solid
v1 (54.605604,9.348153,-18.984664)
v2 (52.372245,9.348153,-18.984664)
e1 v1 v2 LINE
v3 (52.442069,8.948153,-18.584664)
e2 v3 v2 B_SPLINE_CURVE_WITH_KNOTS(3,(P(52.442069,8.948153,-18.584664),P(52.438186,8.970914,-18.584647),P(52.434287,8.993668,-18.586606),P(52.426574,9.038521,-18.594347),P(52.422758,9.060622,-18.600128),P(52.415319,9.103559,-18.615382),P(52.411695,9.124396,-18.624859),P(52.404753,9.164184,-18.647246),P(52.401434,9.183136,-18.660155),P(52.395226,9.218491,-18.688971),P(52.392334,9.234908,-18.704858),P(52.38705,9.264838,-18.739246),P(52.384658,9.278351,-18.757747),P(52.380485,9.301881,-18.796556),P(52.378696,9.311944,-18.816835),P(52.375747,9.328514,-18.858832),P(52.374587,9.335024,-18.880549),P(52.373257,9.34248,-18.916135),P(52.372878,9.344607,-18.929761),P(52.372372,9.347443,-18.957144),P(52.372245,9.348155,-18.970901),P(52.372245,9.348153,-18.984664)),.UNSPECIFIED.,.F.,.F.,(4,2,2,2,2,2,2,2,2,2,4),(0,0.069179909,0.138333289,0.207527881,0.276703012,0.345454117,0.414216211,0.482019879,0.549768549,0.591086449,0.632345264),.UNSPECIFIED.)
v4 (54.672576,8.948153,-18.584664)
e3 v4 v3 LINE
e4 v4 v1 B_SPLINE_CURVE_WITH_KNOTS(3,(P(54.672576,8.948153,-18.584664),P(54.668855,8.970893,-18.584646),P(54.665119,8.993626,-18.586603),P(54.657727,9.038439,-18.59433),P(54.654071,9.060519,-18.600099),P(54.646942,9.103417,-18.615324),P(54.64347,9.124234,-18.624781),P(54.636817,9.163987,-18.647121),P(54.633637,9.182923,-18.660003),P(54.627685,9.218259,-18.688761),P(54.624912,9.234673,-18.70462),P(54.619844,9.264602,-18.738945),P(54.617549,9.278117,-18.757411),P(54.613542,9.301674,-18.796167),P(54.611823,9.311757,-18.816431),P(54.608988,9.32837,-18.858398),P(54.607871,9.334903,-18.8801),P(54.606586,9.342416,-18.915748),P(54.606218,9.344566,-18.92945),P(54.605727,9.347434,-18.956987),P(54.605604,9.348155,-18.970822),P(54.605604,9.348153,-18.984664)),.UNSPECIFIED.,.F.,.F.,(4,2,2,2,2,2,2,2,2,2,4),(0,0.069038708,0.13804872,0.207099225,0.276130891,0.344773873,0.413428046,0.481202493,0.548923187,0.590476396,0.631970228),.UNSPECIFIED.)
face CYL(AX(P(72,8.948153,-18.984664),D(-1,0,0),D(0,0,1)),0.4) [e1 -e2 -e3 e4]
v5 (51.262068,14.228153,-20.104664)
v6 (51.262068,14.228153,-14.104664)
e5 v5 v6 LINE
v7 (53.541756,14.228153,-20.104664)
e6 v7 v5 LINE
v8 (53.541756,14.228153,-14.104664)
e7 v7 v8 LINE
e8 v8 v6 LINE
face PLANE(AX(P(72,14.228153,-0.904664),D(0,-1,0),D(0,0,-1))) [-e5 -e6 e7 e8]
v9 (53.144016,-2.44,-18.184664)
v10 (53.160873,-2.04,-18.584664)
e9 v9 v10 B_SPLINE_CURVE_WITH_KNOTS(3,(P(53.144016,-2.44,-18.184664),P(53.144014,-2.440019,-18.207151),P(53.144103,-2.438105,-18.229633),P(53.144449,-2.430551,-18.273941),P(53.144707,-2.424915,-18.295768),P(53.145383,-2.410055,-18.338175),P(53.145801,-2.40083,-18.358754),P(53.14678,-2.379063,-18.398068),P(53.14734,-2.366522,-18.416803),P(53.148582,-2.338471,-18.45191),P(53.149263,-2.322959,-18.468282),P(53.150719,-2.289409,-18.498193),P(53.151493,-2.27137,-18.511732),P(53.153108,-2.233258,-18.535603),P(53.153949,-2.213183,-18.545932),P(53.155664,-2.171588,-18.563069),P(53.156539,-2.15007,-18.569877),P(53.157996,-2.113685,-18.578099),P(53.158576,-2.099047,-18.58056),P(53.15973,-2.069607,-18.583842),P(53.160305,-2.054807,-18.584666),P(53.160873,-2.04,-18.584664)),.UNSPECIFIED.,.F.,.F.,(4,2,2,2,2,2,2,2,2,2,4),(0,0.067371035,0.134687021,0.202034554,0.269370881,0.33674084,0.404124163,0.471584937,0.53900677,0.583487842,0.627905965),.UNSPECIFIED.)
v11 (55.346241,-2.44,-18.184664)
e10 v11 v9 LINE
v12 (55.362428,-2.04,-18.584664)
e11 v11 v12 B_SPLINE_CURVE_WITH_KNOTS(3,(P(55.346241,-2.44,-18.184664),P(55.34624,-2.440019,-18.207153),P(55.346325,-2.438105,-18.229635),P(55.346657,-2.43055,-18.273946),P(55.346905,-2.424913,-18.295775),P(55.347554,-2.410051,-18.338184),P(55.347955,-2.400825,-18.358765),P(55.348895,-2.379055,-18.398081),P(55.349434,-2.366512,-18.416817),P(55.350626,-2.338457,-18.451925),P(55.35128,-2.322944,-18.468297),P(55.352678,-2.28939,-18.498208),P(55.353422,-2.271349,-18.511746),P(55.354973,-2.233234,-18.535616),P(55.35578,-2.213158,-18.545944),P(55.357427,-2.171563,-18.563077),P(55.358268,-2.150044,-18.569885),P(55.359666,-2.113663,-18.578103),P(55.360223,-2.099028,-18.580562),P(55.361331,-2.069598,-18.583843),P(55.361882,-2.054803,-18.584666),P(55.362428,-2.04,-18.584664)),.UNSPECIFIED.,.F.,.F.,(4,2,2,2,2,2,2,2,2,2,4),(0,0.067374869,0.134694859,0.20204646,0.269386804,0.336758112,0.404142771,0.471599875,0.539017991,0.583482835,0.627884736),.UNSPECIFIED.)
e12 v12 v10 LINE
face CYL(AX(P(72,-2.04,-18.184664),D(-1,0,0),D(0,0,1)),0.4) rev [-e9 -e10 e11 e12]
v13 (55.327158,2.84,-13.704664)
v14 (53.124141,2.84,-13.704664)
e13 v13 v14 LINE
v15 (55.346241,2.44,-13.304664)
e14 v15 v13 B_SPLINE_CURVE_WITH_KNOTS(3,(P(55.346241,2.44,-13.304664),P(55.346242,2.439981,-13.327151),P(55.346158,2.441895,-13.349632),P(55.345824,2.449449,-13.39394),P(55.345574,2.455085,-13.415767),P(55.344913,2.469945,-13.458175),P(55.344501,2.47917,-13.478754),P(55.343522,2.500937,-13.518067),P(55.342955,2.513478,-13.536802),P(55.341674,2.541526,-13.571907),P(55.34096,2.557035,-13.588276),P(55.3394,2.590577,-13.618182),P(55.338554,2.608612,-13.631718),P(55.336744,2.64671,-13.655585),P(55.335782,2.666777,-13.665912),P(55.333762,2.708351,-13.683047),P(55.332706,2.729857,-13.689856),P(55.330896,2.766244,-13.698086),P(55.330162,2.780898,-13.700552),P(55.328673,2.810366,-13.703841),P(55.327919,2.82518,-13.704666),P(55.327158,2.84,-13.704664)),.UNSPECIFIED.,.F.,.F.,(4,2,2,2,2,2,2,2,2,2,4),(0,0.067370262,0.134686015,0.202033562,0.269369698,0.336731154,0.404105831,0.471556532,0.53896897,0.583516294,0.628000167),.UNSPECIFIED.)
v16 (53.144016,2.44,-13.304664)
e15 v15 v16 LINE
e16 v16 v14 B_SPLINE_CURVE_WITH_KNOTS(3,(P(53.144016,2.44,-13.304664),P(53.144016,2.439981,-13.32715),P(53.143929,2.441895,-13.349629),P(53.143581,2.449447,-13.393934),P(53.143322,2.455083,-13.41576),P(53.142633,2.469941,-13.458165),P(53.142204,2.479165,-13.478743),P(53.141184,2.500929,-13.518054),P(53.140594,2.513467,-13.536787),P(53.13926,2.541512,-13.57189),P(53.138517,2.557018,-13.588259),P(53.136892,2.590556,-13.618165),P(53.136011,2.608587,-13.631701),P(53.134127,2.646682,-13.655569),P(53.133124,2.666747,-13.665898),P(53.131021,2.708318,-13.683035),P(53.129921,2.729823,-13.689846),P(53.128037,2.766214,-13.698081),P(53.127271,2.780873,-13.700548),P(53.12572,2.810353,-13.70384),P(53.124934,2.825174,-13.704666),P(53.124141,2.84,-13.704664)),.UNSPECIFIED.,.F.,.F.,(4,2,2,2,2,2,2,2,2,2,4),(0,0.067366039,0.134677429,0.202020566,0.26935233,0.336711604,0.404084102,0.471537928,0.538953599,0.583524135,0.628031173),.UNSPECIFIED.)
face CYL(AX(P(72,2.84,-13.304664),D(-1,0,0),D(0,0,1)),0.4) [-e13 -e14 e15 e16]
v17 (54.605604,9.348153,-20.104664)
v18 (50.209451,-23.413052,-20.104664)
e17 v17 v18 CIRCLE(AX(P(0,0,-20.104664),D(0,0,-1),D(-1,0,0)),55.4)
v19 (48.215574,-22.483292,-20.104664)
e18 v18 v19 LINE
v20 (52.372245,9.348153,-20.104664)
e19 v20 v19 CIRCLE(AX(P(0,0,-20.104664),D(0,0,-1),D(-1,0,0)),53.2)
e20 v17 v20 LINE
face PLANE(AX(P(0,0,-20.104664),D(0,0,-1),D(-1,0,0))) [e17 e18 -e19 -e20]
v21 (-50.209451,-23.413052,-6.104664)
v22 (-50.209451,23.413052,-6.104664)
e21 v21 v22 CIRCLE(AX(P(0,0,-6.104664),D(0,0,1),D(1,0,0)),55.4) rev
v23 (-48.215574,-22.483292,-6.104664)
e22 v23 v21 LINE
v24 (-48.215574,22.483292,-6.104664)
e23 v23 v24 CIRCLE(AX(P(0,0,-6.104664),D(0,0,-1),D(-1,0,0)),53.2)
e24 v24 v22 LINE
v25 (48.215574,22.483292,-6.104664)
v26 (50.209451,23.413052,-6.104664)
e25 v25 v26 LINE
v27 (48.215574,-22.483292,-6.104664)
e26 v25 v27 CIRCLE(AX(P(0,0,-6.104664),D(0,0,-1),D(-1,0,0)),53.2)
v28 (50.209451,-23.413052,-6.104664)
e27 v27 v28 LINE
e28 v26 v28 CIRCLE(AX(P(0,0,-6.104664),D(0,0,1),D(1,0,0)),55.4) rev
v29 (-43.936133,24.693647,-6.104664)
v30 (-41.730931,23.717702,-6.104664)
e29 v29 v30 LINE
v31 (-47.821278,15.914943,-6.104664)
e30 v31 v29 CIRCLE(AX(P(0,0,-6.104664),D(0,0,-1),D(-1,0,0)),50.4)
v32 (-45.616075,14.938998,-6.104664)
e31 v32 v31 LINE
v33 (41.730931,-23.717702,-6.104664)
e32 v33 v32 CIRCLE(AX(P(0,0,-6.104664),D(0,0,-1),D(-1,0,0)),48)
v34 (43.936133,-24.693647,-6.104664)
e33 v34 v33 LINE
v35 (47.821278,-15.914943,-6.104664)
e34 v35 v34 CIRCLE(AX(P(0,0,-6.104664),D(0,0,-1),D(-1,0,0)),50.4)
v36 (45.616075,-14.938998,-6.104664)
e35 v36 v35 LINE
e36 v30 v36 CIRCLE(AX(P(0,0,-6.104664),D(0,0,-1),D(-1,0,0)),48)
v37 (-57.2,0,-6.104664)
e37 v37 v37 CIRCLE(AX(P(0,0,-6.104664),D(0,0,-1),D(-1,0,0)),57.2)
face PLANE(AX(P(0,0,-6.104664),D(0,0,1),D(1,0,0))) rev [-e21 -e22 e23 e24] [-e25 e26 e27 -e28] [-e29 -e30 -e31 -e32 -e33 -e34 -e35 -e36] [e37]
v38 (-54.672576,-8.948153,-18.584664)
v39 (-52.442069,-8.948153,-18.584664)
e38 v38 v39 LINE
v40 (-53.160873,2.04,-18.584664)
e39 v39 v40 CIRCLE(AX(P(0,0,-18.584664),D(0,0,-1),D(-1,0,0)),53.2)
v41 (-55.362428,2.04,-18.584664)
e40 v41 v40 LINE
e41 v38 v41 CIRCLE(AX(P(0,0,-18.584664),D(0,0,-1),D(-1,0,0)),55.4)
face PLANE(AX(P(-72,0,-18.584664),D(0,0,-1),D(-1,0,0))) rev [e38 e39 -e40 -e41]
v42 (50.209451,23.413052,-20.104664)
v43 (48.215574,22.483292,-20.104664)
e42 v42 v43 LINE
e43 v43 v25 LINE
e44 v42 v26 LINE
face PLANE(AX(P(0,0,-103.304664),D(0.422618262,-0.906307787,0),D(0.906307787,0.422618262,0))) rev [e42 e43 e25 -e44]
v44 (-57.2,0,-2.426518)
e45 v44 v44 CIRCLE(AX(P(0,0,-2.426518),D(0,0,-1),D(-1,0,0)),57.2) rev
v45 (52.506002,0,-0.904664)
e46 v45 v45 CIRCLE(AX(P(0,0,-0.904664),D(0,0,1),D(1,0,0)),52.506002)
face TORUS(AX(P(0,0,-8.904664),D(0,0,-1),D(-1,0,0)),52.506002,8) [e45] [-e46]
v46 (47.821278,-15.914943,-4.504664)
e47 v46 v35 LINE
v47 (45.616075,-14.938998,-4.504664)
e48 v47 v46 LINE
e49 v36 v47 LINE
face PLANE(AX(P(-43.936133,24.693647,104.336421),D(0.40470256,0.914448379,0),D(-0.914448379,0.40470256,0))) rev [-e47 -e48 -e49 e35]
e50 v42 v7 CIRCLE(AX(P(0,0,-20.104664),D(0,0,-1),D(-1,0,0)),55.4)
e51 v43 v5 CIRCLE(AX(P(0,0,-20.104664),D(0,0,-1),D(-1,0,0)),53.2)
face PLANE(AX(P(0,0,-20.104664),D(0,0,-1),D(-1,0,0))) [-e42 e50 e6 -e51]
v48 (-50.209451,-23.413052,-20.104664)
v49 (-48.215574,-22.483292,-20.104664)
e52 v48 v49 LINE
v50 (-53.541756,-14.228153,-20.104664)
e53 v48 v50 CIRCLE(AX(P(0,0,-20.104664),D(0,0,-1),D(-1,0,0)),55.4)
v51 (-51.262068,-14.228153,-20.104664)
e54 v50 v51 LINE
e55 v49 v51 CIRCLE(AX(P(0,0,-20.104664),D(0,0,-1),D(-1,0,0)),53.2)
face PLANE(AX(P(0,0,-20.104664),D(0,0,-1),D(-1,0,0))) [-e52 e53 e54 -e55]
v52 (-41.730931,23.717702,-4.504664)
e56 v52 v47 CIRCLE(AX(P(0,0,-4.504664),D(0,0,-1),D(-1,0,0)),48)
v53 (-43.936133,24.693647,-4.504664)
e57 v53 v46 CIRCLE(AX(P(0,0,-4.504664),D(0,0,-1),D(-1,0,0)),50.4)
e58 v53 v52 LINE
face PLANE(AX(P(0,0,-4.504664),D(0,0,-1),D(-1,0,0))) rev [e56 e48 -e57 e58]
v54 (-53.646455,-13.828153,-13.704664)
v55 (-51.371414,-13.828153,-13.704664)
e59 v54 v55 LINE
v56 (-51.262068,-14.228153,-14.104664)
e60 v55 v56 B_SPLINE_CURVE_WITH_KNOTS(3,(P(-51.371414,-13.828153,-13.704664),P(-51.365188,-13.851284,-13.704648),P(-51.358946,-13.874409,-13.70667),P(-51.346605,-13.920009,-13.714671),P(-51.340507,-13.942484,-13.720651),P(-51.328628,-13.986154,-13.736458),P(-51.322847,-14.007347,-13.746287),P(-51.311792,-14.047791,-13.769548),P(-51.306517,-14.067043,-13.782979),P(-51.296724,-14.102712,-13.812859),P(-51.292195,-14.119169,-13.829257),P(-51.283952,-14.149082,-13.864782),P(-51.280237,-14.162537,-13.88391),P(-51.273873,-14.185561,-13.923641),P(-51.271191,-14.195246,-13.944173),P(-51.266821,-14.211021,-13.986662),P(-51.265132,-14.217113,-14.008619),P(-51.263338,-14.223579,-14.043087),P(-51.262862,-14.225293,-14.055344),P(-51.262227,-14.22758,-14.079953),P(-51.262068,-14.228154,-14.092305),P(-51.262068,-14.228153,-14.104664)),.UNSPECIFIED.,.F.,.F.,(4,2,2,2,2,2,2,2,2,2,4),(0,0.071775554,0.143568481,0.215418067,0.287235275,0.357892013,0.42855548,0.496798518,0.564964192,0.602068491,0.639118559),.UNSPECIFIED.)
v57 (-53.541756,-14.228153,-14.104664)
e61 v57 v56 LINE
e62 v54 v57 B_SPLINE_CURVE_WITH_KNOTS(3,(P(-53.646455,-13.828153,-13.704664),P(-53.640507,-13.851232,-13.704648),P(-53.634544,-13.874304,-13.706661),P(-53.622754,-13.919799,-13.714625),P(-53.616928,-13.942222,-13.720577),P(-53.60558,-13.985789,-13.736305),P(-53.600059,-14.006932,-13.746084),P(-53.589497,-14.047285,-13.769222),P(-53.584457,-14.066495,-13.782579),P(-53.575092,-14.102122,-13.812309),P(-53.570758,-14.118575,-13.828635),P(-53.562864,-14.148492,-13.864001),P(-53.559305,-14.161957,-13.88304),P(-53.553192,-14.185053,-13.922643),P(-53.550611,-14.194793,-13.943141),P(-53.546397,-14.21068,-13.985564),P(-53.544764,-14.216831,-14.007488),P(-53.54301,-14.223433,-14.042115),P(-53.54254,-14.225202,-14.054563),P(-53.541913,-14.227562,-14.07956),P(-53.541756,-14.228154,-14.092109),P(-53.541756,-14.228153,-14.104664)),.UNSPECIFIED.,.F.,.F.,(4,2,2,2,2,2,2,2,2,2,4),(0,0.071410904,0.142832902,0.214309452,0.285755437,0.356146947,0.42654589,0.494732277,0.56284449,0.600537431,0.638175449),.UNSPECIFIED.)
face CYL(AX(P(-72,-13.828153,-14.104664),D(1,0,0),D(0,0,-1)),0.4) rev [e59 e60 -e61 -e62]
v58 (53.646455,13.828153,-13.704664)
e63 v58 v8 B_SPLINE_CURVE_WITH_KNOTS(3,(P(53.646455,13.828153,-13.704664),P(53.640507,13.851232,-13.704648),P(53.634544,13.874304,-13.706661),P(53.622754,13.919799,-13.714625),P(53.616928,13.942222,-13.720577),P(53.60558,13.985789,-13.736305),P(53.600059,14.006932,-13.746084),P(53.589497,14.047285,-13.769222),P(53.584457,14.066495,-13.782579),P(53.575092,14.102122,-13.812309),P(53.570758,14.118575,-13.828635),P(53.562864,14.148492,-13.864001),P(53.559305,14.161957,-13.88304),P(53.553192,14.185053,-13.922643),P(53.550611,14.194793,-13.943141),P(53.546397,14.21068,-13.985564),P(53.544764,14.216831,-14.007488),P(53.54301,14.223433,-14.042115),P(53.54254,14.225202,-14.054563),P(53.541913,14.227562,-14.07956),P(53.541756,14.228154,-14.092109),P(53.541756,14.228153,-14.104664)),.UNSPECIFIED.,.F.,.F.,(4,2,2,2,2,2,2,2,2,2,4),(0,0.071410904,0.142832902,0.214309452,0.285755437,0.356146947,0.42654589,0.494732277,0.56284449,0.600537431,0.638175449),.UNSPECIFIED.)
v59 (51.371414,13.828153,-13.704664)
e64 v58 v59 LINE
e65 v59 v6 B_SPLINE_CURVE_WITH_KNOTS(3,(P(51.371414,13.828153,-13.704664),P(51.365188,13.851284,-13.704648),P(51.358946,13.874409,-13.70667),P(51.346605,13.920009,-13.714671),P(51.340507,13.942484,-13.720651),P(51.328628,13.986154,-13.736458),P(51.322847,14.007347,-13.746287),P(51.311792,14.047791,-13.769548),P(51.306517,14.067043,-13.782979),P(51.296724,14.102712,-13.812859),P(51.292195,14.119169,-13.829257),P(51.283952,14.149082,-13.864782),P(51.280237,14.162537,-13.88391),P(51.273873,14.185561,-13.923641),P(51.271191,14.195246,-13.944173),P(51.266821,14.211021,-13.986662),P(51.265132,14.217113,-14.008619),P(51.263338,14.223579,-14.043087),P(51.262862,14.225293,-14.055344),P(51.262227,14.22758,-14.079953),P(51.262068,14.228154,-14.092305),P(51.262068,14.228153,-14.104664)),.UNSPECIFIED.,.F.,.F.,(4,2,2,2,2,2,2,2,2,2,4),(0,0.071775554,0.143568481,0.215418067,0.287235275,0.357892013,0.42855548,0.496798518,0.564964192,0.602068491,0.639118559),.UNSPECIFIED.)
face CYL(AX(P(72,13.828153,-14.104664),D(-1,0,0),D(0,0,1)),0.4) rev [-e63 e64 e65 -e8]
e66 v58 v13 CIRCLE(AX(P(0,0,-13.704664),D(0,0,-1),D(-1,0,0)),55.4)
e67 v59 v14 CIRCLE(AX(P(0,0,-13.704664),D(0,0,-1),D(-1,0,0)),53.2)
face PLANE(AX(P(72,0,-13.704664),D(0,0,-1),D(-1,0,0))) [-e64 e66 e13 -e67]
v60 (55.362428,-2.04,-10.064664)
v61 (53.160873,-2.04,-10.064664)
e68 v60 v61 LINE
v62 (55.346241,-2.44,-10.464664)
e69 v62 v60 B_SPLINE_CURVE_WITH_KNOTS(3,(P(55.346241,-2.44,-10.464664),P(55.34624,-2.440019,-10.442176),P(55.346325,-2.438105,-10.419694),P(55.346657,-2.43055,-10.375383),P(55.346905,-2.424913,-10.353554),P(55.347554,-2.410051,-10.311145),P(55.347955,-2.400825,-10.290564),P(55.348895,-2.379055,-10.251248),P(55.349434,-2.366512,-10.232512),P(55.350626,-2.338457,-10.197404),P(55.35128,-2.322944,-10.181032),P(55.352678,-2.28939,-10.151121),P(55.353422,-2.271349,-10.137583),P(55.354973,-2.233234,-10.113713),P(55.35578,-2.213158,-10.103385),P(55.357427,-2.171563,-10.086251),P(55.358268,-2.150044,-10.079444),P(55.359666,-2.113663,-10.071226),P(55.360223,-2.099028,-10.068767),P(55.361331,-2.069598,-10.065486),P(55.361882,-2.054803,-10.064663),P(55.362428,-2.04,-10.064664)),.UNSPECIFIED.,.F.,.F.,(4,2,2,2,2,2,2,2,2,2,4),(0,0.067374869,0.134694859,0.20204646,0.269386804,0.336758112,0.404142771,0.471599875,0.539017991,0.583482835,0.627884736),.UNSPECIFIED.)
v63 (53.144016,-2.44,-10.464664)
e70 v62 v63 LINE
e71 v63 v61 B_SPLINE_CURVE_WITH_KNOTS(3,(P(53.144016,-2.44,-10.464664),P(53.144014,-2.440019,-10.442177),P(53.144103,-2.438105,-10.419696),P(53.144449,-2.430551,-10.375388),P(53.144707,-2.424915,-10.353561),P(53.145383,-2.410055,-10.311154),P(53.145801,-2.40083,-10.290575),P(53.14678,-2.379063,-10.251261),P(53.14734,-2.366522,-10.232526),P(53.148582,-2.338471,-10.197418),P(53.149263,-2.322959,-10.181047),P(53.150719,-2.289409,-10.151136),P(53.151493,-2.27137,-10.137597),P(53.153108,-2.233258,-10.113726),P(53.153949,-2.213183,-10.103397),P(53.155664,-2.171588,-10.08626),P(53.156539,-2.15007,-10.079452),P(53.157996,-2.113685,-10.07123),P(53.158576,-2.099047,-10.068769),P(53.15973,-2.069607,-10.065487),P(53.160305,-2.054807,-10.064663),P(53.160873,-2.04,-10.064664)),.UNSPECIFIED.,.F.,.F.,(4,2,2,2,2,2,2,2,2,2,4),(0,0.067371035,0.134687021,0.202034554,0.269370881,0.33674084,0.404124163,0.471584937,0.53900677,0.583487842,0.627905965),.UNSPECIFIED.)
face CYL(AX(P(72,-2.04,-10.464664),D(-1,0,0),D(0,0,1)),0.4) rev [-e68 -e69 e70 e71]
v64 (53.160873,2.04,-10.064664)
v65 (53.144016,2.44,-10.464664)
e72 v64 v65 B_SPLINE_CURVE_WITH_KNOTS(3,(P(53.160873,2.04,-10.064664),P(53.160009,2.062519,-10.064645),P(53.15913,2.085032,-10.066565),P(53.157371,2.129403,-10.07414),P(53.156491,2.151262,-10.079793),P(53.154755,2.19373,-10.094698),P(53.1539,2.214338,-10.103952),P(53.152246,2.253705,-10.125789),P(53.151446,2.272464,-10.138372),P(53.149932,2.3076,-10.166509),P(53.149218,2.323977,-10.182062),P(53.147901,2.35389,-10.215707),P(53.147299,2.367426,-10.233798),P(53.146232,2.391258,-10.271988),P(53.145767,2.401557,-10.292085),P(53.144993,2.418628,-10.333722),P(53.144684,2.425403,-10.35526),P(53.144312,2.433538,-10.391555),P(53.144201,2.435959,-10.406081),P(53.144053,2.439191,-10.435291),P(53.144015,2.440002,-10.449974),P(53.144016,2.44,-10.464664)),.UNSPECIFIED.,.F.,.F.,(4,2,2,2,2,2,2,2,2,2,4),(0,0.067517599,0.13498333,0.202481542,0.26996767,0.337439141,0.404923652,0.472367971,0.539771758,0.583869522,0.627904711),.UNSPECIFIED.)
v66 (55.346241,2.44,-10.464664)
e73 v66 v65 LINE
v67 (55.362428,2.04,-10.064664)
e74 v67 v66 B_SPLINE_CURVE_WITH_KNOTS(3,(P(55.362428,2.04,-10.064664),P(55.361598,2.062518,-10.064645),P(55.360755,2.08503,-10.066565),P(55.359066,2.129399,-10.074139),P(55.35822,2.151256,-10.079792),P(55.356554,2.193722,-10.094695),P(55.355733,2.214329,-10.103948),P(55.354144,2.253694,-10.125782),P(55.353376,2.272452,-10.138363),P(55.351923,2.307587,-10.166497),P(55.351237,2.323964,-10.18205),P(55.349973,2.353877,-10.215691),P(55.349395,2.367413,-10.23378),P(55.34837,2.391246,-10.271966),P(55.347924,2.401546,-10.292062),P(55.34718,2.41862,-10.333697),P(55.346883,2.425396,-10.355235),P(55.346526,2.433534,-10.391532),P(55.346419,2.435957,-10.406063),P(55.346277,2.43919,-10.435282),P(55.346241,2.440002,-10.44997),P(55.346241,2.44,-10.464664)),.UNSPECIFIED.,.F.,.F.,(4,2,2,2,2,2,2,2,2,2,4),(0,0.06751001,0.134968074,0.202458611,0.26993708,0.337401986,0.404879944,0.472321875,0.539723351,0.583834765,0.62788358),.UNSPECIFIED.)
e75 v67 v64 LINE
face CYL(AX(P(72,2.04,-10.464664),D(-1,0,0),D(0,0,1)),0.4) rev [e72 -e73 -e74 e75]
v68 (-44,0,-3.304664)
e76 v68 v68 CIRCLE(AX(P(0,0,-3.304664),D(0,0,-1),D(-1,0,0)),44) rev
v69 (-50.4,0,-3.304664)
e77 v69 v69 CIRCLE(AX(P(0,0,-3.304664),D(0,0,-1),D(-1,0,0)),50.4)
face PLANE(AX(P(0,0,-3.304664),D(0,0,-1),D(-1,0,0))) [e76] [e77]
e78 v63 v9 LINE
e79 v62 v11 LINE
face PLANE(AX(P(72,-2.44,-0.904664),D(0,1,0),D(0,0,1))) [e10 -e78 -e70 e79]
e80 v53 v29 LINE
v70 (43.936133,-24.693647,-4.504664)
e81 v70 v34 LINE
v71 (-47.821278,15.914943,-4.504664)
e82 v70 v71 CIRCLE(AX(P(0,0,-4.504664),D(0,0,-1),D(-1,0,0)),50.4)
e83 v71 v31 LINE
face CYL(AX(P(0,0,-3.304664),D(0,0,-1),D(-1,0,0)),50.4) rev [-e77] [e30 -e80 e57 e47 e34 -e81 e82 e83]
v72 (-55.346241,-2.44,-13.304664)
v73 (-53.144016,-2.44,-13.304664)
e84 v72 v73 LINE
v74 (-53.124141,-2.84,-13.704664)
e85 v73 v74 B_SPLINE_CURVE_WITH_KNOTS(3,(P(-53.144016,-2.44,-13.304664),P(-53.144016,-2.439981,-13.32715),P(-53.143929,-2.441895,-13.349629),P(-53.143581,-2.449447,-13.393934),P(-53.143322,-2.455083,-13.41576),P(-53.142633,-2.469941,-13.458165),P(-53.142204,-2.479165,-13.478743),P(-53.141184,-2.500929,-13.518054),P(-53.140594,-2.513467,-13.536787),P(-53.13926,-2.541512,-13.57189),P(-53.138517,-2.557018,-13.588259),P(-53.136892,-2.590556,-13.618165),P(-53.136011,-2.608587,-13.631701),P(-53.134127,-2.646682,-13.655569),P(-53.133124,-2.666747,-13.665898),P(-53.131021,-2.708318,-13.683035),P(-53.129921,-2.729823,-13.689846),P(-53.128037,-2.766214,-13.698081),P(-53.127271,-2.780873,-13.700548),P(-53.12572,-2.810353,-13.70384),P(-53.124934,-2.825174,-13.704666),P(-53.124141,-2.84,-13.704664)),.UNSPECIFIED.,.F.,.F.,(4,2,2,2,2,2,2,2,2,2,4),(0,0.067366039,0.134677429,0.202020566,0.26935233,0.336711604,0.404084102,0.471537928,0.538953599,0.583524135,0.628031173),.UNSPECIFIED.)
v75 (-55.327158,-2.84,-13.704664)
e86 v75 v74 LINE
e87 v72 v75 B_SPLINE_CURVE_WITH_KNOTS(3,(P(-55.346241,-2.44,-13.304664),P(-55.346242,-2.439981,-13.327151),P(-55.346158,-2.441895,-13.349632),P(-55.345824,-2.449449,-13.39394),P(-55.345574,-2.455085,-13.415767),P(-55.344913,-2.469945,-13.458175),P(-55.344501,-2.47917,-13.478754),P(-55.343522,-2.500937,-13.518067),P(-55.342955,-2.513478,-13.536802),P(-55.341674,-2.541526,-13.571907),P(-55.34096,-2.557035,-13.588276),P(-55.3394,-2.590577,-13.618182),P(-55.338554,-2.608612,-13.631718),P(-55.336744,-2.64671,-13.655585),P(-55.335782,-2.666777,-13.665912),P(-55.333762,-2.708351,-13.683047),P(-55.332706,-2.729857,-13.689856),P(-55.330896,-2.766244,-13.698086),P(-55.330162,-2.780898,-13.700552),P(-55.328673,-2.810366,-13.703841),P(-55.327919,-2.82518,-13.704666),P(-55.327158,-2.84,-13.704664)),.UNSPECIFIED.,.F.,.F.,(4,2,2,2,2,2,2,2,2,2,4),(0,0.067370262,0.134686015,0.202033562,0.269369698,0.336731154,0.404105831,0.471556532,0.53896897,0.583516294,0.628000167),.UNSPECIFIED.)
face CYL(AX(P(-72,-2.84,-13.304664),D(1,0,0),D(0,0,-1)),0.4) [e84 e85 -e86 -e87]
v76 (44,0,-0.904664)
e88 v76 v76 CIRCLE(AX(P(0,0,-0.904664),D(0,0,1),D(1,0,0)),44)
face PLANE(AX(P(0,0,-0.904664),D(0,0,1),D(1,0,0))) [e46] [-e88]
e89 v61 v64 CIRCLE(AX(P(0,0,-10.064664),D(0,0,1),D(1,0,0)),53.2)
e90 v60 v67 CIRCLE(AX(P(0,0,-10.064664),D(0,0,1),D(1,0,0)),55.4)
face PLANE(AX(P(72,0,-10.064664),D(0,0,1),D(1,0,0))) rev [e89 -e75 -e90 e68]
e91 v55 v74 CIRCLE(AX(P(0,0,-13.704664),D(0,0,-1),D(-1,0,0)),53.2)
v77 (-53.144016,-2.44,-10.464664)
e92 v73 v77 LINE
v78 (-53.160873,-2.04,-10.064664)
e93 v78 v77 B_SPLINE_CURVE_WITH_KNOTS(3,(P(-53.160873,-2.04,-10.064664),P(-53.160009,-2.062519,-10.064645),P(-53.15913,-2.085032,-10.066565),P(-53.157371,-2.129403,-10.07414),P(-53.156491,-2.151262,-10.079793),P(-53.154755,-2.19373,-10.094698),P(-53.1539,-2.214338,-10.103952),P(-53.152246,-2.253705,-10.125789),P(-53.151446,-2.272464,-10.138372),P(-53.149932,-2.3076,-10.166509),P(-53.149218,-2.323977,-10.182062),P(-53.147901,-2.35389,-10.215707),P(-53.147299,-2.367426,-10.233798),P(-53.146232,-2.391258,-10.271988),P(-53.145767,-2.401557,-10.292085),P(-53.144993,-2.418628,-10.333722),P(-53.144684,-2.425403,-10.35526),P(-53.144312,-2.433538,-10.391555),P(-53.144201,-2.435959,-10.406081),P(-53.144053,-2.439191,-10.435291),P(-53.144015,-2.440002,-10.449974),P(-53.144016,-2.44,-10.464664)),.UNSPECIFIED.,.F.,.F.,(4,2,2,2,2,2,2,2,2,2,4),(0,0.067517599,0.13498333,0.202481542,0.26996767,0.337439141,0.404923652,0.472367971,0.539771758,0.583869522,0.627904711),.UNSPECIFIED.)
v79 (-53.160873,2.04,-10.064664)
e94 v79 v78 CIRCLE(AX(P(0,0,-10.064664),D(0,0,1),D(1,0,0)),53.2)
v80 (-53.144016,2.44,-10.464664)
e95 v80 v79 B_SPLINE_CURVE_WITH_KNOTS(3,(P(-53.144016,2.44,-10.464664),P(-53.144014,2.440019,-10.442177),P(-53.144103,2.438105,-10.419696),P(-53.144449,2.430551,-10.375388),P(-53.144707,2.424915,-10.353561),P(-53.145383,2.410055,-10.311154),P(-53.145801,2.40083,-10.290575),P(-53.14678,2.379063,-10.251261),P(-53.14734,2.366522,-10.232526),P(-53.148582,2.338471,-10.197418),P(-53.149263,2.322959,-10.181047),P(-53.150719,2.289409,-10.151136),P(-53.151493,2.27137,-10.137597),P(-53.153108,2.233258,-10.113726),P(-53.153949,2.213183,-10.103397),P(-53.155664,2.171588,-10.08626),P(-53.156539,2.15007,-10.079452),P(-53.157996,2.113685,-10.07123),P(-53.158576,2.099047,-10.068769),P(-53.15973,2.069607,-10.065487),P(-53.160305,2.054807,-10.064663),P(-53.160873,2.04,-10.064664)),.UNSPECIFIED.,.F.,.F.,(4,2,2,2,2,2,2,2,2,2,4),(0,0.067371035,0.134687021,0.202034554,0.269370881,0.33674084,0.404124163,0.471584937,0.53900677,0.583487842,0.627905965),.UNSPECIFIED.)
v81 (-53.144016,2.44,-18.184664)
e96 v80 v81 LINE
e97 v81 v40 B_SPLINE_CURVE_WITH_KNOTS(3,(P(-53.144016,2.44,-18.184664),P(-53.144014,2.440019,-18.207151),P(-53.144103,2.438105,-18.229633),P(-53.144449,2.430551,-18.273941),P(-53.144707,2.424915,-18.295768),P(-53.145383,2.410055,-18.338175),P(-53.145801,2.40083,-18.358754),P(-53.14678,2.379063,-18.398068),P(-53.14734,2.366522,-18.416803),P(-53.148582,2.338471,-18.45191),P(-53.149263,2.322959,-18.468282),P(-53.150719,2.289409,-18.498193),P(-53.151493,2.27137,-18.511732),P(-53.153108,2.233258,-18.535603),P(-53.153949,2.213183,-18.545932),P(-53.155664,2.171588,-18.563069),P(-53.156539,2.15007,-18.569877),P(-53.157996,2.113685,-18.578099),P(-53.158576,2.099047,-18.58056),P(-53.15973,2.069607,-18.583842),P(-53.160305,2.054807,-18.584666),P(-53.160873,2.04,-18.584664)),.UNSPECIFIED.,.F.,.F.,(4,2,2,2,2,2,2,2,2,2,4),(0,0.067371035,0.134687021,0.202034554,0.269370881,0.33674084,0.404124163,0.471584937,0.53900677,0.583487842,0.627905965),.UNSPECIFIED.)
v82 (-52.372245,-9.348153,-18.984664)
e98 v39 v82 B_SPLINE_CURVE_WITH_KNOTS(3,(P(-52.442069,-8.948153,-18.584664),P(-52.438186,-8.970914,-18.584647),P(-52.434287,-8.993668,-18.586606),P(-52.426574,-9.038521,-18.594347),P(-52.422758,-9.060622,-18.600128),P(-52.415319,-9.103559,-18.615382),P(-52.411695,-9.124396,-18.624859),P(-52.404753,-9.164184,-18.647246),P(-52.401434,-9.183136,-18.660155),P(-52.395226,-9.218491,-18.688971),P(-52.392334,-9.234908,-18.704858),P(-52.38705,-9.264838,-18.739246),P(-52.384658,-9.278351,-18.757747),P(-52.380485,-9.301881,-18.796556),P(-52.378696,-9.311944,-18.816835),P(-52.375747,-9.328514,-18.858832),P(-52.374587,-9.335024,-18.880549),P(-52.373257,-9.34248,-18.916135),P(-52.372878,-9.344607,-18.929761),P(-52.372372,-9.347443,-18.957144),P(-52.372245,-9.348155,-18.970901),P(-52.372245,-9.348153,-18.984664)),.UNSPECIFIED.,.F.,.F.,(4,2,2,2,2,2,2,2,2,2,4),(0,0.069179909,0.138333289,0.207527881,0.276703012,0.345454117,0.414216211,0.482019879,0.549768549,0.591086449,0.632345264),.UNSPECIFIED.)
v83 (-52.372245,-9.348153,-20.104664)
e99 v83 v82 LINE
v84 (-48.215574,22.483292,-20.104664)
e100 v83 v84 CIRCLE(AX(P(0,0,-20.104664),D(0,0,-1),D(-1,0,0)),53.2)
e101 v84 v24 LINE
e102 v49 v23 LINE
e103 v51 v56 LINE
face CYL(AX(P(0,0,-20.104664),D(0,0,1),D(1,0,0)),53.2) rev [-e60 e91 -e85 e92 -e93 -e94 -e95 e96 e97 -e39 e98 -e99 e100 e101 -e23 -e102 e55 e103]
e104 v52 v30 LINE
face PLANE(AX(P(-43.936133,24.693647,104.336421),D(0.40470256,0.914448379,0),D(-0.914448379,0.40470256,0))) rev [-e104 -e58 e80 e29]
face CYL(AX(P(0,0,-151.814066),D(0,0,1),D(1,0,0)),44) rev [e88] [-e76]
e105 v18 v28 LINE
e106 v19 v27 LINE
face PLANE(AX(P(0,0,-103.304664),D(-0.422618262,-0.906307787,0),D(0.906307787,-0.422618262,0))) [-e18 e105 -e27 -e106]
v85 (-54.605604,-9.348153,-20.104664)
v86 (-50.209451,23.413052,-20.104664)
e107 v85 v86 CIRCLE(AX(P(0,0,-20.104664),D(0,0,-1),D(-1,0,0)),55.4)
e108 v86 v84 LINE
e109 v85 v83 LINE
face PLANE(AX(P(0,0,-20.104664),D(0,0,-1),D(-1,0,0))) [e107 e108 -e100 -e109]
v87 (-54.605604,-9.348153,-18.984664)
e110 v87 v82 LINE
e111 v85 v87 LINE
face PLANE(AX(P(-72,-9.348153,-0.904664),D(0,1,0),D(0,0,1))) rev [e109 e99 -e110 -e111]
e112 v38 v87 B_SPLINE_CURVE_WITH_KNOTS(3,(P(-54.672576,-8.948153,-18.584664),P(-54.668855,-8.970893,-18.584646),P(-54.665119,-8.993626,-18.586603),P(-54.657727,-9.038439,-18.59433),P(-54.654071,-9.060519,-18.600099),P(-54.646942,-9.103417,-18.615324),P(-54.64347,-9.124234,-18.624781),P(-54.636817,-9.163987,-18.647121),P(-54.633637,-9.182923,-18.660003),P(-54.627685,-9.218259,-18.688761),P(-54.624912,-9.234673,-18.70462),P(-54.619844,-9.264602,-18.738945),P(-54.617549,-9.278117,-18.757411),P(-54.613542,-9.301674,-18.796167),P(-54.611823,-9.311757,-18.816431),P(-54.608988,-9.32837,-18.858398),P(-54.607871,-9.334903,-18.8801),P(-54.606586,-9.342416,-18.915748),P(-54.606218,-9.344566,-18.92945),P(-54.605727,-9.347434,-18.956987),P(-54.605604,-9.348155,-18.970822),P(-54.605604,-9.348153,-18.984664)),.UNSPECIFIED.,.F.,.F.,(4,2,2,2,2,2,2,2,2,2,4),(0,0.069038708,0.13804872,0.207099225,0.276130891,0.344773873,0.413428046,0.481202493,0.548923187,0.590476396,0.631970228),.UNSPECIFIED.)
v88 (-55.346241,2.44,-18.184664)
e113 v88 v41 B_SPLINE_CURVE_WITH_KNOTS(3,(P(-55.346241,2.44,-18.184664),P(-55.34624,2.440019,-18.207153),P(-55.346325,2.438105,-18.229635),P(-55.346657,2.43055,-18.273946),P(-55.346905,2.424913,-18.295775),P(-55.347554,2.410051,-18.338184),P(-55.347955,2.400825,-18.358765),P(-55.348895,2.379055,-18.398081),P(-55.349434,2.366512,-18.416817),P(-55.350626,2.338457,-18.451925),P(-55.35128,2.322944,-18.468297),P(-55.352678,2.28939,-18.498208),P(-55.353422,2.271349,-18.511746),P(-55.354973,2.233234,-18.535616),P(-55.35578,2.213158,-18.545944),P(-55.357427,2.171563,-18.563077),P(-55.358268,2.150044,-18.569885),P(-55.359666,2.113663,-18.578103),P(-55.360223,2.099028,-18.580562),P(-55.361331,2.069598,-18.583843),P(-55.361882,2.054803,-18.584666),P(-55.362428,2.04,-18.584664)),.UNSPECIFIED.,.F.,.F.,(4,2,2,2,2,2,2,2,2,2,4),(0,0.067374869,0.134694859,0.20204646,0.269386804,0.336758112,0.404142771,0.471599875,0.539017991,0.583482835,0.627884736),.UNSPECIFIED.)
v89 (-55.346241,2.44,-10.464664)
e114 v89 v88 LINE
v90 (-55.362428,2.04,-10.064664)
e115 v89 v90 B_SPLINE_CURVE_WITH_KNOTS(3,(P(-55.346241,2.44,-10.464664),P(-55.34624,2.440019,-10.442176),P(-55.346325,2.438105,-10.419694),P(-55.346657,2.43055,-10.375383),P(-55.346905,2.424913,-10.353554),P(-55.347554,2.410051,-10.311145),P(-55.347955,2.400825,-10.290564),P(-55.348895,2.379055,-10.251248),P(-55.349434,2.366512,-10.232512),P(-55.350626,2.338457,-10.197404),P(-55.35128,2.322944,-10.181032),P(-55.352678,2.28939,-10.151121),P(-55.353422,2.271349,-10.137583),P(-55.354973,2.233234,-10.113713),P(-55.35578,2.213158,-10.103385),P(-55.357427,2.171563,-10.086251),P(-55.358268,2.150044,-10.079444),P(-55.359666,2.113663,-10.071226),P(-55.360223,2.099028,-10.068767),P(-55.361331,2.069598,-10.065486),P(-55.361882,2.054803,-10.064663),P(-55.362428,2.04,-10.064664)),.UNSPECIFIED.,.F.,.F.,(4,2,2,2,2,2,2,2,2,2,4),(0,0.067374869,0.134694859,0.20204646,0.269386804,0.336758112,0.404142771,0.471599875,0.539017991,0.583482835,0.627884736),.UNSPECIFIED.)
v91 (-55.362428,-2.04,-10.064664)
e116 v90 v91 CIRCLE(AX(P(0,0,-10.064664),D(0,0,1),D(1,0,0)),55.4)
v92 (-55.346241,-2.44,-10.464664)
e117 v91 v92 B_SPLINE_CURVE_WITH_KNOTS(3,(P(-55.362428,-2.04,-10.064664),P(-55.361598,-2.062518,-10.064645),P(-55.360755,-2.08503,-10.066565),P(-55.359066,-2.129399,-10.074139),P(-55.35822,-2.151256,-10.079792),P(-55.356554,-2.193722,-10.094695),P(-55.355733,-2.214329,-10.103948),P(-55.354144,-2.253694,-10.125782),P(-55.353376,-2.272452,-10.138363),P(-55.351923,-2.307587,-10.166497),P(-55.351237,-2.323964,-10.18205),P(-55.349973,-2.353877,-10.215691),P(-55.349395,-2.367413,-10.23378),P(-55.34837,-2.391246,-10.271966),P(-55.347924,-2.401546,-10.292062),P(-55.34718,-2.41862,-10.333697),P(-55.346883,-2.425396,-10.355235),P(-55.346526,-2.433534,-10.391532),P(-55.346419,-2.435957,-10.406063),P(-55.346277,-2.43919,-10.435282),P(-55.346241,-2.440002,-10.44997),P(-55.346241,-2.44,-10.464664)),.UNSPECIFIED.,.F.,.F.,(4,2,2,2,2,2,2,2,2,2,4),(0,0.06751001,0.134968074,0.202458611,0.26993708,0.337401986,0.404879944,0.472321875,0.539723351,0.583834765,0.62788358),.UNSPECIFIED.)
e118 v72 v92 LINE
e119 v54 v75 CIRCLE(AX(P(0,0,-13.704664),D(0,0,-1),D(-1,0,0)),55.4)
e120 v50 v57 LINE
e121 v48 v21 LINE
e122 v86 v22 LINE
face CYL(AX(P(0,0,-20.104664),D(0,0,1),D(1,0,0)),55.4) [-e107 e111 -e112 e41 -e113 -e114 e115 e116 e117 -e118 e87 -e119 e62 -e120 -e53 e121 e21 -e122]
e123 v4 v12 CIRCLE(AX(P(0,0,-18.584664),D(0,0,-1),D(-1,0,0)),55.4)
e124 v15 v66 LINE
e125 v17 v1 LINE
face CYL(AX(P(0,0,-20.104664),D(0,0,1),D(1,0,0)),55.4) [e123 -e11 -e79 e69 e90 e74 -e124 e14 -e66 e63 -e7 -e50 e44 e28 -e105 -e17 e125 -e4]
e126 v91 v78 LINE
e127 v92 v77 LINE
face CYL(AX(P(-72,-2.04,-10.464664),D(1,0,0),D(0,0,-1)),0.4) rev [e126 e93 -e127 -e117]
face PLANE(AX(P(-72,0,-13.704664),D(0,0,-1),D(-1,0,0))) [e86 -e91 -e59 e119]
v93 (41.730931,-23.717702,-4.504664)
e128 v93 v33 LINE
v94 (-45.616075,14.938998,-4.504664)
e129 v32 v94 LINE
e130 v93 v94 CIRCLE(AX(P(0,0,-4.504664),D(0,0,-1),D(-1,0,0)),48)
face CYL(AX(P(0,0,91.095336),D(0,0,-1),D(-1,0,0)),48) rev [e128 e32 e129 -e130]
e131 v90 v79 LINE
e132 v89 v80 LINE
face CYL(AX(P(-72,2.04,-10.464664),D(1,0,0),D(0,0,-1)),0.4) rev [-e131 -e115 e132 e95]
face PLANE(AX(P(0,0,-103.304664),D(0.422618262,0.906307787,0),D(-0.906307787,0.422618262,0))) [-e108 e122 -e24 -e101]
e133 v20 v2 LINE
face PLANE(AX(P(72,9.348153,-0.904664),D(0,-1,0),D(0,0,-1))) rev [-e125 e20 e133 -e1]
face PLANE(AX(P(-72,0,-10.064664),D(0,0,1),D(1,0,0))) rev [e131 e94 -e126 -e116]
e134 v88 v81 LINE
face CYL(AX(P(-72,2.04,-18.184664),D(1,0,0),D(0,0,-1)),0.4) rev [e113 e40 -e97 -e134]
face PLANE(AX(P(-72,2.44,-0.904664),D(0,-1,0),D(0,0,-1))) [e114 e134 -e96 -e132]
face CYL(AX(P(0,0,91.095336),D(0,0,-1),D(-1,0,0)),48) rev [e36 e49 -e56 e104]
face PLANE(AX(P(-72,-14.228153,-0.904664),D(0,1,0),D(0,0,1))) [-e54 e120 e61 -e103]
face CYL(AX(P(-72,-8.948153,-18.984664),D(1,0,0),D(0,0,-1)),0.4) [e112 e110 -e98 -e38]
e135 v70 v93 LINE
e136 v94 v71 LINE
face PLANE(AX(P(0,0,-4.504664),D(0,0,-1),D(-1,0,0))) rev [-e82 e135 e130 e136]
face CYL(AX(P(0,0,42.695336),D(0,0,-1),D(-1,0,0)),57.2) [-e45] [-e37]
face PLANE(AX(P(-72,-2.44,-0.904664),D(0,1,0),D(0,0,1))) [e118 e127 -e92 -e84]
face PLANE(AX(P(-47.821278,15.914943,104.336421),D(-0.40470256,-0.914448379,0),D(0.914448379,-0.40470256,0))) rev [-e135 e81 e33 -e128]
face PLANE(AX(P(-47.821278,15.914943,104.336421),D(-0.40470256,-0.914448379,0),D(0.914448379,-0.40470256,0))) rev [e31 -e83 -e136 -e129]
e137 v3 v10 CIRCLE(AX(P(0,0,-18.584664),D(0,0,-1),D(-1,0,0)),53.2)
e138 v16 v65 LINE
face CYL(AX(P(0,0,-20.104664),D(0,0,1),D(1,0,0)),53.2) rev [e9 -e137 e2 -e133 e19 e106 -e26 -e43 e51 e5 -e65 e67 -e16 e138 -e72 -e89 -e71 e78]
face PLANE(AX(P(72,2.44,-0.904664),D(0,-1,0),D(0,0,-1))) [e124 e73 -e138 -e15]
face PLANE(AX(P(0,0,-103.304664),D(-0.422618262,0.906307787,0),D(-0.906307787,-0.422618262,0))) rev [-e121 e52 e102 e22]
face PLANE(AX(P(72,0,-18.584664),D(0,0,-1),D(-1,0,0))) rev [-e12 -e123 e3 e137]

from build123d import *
from build123d.topology import SkipClean

# Parameters (mm, degrees)
CROQUIS1_R              = 75
SALIENTE_EXTRUIR1_DEPTH = 6.5
CROQUIS2_R              = 69.25
CROQUIS2_R_2            = 66.5
SALIENTE_EXTRUIR2_DEPTH = 17.5
REDONDEO1_R             = 10
CROQUIS5_R              = 60
CORTAR_EXTRUIR2_DEPTH   = 121.5
CORTAR_EXTRUIR3_START   = 121.5
CROQUIS6_R              = 66.5
CORTAR_EXTRUIR3_DEPTH   = 121.5
CORTAR_EXTRUIR4_START   = -2
CROQUIS7_R              = 63
CROQUIS7_R_2            = 60
CORTAR_EXTRUIR4_DEPTH   = 1.5
CORTAR_EXTRUIR5_DEPTH   = 3.5
CROQUIS9_R              = 65.632503002
CROQUIS9_R_2            = 55
SALIENTE_EXTRUIR3_DEPTH = 3
CORTAR_EXTRUIR7_DEPTH   = 90
MATRIZC1_COUNT          = 2
CROQUIS11_OUTSIDE_W     = 194.698
CROQUIS11_OUTSIDE_H     = 194.698
CROQUIS11_OUTSIDE_R     = 71.5
CORTAR_EXTRUIR8_DEPTH   = 61
ESCALA1_SCALE           = 0.8


with BuildPart() as part:
    # Croquis1 → Saliente-Extruir1 (new body)
    with BuildSketch(Plane.XY):
        Circle(CROQUIS1_R)
    extrude(amount=-SALIENTE_EXTRUIR1_DEPTH)

    # Croquis2 → Saliente-Extruir2 (add)
    with BuildSketch(Plane(origin=(0, 0, -6.5), x_dir=(-1, 0, 0), z_dir=(0, 0, -1))):
        with Locations(Location((0, 0, 0), (0, 0, 180))):
            Circle(CROQUIS2_R)
        Circle(CROQUIS2_R_2, mode=Mode.SUBTRACT)
    extrude(amount=SALIENTE_EXTRUIR2_DEPTH)

    # Redondeo1
    # the kernel refuses this fillet: 10 mm, written as the material it takes off along each edge
    with BuildSketch(Plane(origin=(0, 0, 0), x_dir=(1, 0, 0), z_dir=(0, -1, 0))) as redondeo1_piece_1:
        with BuildLine():
            CenterArc((65.632503002, -10), REDONDEO1_R, 20.487315115, 69.512684885)
            Line((65.632503002, 0), (65.632503002, 0.2))
            Line((65.632503002, 0.2), (75, 0.2))
            Line((75, 0.2), (75.2, 0))
            ThreePointArc((75.2, 0), (75.2, -3.25), (75.18734994, -6.43))
            Line((75.18734994, -6.43), (75, -6.5))
        make_face()
    revolve(axis=Axis((0, 0, 0), (0, 0, 1)), mode=Mode.SUBTRACT)

    # Croquis5 → Cortar-Extruir2 (cut)
    with BuildSketch(Plane(origin=(0, 0, -6.5), x_dir=(-1, 0, 0), z_dir=(0, 0, -1))):
        Circle(CROQUIS5_R)
    extrude(amount=-CORTAR_EXTRUIR2_DEPTH, mode=Mode.SUBTRACT)

    # Croquis6 → Cortar-Extruir3 (cut)
    with BuildSketch(Plane(origin=(0, 0, -6.5), x_dir=(-1, 0, 0), z_dir=(0, 0, -1)).offset(CORTAR_EXTRUIR3_START)):
        with BuildLine():
            ThreePointArc((53.795389167, 0), (-11.643453263, -52.520223645), (-48.755180109, 22.734913859))
            Line((-48.755180109, 22.734913859), (-54.378467222, 25.357095704))
            ThreePointArc((-54.378467222, 25.357095704), (-12.986376836, -58.577760427), (60, 0))
            ThreePointArc((60, 0), (58.577760427, 12.986376836), (54.378467222, 25.357095704))
            Line((54.378467222, 25.357095704), (48.755180109, 22.734913859))
            ThreePointArc((48.755180109, 22.734913859), (52.520223645, 11.643453263), (53.795389167, 0))
        make_face()
        with BuildLine():
            Line((-54.378467222, 25.357095704), (-48.755180109, 22.734913859))
            ThreePointArc((-48.755180109, 22.734913859), (0, 53.795389167), (48.755180109, 22.734913859))
            Line((48.755180109, 22.734913859), (54.378467222, 25.357095704))
            ThreePointArc((54.378467222, 25.357095704), (0, 60), (-54.378467222, 25.357095704))
        make_face()
        Circle(CROQUIS6_R)
        with BuildLine():
            Line((0, 0), (76.100368106, 35.486184436))
            ThreePointArc((76.100368106, 35.486184436), (0, 83.967465793), (-76.100368106, 35.486184436))
            Line((-76.100368106, 35.486184436), (0, 0))
        make_face()
        with BuildLine():
            ThreePointArc((60, 0), (-12.986376836, -58.577760427), (-54.378467222, 25.357095704))
            Line((-54.378467222, 25.357095704), (-60.269467838, 28.104114406))
            ThreePointArc((-60.269467838, 28.104114406), (-14.393234327, -64.923684473), (66.5, 0))
            ThreePointArc((66.5, 0), (64.923684473, 14.393234327), (60.269467838, 28.104114406))
            Line((60.269467838, 28.104114406), (54.378467222, 25.357095704))
            ThreePointArc((54.378467222, 25.357095704), (58.577760427, 12.986376836), (60, 0))
        make_face()
        with BuildLine():
            Line((-60.269467838, 28.104114406), (-54.378467222, 25.357095704))
            ThreePointArc((-54.378467222, 25.357095704), (0, 60), (54.378467222, 25.357095704))
            Line((54.378467222, 25.357095704), (60.269467838, 28.104114406))
            ThreePointArc((60.269467838, 28.104114406), (0, 66.5), (-60.269467838, 28.104114406))
        make_face()
    cortar_extruir3 = extrude(amount=-CORTAR_EXTRUIR3_DEPTH, mode=Mode.SUBTRACT)

    # Croquis7 → Cortar-Extruir4 (cut)
    with BuildSketch(Plane(origin=(0, 0, -6.5), x_dir=(-1, 0, 0), z_dir=(0, 0, -1)).offset(CORTAR_EXTRUIR4_START)):
        Circle(CROQUIS7_R)
        Circle(CROQUIS7_R_2, mode=Mode.SUBTRACT)
    extrude(amount=-CORTAR_EXTRUIR4_DEPTH, mode=Mode.SUBTRACT)

    # Croquis8 → Cortar-Extruir5 (cut)
    with SkipClean():  # the faces are left unmerged after this step: merging them gives an invalid solid
        with BuildSketch(Plane(origin=(0, 0, -6.5), x_dir=(-1, 0, 0), z_dir=(0, 0, -1))):
            with BuildLine():
                Line((59.77659711, 19.893678341), (-54.920166384, -30.867058887))
                ThreePointArc((-54.920166384, -30.867058887), (-57.610247866, -25.49626131), (-59.77659711, -19.893678341))
                Line((-59.77659711, -19.893678341), (54.920166384, 30.867058887))
                ThreePointArc((54.920166384, 30.867058887), (57.610247866, 25.49626131), (59.77659711, 19.893678341))
            make_face()
        extrude(amount=-CORTAR_EXTRUIR5_DEPTH, mode=Mode.SUBTRACT)

    # Croquis9 → Saliente-Extruir3 (add)
    with SkipClean():  # the faces are left unmerged after this step: merging them gives an invalid solid
        with BuildSketch(Plane.XY):
            Circle(CROQUIS9_R)
            Circle(CROQUIS9_R_2, mode=Mode.SUBTRACT)
        extrude(amount=-SALIENTE_EXTRUIR3_DEPTH)

    # Simetría1: Cortar-Extruir3 across plane
    with SkipClean():  # the faces are left unmerged after this step: merging them gives an invalid solid
        add(cortar_extruir3.mirror(Plane.ZX), mode=Mode.SUBTRACT)

    # Croquis10 → Cortar-Extruir7 (cut)
    with SkipClean():  # the faces are left unmerged after this step: merging them gives an invalid solid
        with BuildSketch(Plane(origin=(0, 0, 0), x_dir=(0, 0, -1), z_dir=(1, 0, 0))):
            with BuildLine():
                Line((20.1, -17.78519151), (24, -17.78519151))
                Line((24, -17.78519151), (24, -11.68519151))
                Line((24, -11.68519151), (22.6, -11.68519151))
                ThreePointArc((22.6, -11.68519151), (22.246446609, -11.538744901), (22.1, -11.18519151))
                Line((22.1, -11.18519151), (22.1, -3.05))
                Line((22.1, -3.05), (22.1, 2.55))
                ThreePointArc((22.1, 2.55), (21.953553391, 2.903553391), (21.6, 3.05))
                Line((21.6, 3.05), (11.95, 3.05))
                ThreePointArc((11.95, 3.05), (11.596446609, 2.903553391), (11.45, 2.55))
                Line((11.45, 2.55), (11.45, -2.55))
                ThreePointArc((11.45, -2.55), (11.596446609, -2.903553391), (11.95, -3.05))
                Line((11.95, -3.05), (15.5, -3.05))
                ThreePointArc((15.5, -3.05), (15.853553391, -3.196446609), (16, -3.55))
                Line((16, -3.55), (16, -11.68519151))
                Line((16, -11.68519151), (16, -17.28519151))
                ThreePointArc((16, -17.28519151), (16.146446609, -17.638744901), (16.5, -17.78519151))
                Line((16.5, -17.78519151), (20.1, -17.78519151))
            make_face()
        cortar_extruir7 = extrude(amount=-CORTAR_EXTRUIR7_DEPTH, mode=Mode.SUBTRACT)

    # MatrizC1: Cortar-Extruir7 ×2 about axis
    with SkipClean():  # the faces are left unmerged after this step: merging them gives an invalid solid
        matrizc1_axis = Axis((0, 0, 0), (0, 0, 1))
        for i in range(1, MATRIZC1_COUNT):
            add(cortar_extruir7.rotate(matrizc1_axis, i * 360 / MATRIZC1_COUNT), mode=Mode.SUBTRACT)

    # Croquis11 outside → Cortar-Extruir8 (cut)
    with SkipClean():  # the faces are left unmerged after this step: merging them gives an invalid solid
        with BuildSketch(Plane(origin=(0, 0, -6.5), x_dir=(-1, 0, 0), z_dir=(0, 0, -1))):
            Rectangle(CROQUIS11_OUTSIDE_W, CROQUIS11_OUTSIDE_H)
            Circle(CROQUIS11_OUTSIDE_R, mode=Mode.SUBTRACT)
        extrude(amount=-CORTAR_EXTRUIR8_DEPTH, mode=Mode.SUBTRACT)


with BuildPart() as part_1:
    # Escala1: scaled about (1.06e-07, 2.2e-08, -4.523321709)
    add(part.part.scale(ESCALA1_SCALE).moved(Location((2.1e-08, 4e-09, -0.904664342))))


solid = part_1.part
